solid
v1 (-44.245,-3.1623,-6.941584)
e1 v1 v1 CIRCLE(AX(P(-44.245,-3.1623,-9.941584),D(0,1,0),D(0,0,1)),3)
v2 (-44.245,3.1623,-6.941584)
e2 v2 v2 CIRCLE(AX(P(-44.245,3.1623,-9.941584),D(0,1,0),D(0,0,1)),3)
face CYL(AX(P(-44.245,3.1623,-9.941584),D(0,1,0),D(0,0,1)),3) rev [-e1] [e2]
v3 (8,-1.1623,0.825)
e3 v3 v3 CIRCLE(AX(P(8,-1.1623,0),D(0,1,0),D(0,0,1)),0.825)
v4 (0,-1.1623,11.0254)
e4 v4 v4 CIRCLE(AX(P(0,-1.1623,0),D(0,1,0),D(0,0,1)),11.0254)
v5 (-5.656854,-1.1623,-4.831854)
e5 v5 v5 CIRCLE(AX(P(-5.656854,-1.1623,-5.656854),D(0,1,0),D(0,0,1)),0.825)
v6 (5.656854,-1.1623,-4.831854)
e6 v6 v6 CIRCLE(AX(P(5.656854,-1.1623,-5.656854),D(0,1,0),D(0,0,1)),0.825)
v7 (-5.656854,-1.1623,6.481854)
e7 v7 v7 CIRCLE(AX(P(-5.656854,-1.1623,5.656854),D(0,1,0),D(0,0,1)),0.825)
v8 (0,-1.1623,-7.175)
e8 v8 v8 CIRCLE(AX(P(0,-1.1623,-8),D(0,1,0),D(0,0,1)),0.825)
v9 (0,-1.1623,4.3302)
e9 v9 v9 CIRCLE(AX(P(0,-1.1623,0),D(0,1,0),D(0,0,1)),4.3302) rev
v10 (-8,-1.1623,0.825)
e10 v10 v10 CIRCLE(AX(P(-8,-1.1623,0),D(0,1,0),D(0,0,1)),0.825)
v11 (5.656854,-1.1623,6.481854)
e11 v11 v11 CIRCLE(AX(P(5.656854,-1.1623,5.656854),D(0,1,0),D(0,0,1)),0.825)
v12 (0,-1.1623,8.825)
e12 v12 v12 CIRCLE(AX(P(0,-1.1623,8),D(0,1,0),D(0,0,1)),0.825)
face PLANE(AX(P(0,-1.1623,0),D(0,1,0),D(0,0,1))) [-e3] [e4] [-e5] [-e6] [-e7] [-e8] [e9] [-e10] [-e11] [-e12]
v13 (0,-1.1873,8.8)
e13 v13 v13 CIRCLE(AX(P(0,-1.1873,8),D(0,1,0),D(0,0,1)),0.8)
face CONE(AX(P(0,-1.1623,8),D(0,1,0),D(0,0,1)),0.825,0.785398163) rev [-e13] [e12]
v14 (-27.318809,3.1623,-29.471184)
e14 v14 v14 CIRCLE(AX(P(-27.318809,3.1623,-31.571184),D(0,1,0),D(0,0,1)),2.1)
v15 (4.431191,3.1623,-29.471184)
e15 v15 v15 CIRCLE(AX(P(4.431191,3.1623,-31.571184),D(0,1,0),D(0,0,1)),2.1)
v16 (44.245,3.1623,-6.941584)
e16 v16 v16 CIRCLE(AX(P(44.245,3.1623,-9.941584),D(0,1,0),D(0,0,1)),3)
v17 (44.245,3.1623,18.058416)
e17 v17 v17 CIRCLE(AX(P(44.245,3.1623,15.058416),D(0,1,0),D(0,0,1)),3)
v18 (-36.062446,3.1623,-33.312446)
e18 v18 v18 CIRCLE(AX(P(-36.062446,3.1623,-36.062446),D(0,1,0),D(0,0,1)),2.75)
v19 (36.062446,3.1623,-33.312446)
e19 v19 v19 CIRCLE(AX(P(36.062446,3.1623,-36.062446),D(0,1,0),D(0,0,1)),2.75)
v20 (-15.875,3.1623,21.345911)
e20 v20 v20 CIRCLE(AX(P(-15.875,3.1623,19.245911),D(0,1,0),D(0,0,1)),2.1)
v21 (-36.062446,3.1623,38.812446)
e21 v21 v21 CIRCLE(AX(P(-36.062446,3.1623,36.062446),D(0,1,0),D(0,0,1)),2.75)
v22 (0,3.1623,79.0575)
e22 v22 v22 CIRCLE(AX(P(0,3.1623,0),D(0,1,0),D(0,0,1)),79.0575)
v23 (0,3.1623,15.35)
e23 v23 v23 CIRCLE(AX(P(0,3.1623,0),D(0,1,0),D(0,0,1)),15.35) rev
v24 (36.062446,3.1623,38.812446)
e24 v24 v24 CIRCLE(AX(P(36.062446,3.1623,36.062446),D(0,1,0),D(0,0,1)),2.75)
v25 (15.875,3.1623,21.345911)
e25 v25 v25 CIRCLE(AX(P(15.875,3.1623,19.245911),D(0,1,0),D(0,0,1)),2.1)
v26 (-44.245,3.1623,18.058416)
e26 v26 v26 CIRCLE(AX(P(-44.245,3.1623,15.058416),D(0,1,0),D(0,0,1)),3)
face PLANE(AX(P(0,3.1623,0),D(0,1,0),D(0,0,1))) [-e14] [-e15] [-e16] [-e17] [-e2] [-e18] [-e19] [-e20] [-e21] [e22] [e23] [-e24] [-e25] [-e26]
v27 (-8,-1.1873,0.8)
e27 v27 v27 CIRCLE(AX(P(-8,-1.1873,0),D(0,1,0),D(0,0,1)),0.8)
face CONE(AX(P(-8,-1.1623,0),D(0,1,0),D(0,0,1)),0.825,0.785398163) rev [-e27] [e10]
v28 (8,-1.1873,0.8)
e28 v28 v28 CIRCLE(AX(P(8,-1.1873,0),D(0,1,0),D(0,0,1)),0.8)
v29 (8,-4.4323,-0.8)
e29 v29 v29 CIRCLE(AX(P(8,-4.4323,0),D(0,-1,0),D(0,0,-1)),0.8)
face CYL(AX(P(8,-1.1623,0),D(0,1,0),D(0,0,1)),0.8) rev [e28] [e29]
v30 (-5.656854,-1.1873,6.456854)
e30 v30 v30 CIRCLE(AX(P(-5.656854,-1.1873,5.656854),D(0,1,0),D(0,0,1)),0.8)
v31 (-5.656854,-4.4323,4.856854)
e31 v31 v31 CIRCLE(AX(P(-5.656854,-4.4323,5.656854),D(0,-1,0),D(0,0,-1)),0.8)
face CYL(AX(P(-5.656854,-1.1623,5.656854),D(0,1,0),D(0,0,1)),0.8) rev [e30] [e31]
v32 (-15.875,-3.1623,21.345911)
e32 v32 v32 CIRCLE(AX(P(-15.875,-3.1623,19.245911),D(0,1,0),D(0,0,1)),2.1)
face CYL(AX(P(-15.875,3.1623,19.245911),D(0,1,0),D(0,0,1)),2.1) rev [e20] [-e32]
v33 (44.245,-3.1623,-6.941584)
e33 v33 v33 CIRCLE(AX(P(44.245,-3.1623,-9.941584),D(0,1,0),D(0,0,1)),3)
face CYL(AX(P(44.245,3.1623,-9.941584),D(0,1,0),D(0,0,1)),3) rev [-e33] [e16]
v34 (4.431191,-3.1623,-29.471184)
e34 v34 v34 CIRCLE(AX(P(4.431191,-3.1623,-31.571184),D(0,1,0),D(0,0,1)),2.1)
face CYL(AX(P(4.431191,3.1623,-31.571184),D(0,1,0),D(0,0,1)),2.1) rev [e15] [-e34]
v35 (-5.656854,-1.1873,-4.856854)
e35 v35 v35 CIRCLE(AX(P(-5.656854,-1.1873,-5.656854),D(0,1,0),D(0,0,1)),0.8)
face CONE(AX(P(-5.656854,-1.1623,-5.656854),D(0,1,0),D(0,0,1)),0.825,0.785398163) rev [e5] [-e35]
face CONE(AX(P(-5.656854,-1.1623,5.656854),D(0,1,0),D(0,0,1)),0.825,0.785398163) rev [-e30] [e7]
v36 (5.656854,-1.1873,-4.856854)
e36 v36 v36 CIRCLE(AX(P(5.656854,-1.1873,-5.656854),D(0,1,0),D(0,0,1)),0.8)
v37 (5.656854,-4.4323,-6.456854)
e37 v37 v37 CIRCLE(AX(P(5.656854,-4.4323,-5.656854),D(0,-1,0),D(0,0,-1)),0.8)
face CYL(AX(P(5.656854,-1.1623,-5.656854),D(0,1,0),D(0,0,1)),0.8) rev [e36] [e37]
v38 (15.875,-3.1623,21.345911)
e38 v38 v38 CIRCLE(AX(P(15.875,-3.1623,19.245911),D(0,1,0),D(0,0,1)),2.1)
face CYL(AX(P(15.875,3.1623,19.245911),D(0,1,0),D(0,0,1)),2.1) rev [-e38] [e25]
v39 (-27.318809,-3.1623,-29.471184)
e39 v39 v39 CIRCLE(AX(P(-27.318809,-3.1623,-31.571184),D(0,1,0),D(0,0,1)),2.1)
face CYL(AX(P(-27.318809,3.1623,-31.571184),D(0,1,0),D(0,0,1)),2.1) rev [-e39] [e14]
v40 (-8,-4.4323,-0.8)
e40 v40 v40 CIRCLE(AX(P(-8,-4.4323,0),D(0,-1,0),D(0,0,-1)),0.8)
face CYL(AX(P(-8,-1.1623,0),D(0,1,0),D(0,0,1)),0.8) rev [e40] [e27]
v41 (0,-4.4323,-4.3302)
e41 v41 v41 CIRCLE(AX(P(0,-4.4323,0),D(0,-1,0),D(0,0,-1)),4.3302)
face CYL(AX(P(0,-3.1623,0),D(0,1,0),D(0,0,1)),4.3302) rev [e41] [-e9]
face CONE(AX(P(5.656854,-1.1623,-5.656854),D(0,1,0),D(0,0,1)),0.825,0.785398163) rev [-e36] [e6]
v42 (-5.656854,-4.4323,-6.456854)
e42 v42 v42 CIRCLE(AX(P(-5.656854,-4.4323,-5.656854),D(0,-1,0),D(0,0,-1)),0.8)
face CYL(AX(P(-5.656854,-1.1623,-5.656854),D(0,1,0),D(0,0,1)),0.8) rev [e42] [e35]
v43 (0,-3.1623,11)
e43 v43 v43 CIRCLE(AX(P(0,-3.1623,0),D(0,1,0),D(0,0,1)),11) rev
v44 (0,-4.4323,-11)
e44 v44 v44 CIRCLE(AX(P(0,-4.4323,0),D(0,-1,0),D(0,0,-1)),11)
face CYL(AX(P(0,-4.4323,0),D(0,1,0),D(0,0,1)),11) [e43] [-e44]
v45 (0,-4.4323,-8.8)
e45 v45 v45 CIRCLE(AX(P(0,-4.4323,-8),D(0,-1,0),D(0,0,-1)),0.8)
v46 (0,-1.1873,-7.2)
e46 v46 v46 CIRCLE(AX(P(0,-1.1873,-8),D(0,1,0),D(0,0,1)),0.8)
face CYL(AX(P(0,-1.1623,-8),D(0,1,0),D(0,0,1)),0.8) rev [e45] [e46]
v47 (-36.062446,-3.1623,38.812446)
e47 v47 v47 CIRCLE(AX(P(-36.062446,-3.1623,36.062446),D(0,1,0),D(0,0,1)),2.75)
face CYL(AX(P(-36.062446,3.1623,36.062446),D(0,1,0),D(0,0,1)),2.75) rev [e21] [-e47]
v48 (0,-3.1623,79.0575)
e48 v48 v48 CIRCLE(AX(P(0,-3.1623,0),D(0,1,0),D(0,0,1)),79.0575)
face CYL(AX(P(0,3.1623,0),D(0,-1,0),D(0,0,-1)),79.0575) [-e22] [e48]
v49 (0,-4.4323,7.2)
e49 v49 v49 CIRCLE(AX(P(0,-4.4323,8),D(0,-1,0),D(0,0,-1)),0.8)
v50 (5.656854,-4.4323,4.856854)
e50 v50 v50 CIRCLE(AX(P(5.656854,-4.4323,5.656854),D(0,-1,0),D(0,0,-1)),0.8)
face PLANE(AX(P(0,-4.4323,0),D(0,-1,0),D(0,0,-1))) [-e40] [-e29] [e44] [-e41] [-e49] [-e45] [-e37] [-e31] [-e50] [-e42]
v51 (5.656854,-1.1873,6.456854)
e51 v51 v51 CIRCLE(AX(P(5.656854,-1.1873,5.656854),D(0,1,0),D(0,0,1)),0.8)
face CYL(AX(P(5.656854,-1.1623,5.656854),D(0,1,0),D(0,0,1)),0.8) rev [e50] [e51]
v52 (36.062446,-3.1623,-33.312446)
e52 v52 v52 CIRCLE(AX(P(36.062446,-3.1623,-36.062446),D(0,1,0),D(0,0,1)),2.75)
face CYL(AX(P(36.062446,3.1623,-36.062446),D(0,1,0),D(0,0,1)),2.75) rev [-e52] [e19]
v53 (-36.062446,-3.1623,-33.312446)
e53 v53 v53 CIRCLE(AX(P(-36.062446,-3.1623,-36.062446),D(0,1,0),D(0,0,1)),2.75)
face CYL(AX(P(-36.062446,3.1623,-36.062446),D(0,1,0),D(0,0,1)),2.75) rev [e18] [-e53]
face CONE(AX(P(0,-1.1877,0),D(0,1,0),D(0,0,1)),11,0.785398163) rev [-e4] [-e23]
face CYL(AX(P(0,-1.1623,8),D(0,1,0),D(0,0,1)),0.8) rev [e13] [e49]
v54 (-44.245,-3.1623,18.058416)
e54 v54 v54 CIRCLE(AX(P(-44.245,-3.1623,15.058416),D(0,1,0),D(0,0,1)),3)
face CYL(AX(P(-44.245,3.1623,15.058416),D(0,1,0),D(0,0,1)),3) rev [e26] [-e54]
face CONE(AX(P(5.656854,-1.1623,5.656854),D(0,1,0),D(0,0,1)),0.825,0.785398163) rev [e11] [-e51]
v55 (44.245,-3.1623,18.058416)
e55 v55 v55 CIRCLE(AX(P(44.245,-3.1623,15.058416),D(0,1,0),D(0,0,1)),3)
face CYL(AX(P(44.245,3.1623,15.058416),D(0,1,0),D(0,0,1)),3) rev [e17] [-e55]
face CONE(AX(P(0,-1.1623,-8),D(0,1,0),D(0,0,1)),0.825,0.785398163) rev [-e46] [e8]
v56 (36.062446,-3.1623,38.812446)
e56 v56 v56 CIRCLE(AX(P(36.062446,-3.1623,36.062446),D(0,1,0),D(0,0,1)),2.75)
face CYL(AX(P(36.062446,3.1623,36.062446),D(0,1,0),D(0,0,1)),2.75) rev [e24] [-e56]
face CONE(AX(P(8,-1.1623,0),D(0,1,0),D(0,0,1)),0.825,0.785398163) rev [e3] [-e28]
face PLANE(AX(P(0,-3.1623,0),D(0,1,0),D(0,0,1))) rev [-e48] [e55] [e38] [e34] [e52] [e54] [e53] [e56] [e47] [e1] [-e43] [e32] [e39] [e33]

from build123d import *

# Parameters (mm, degrees)
SKETCH1_R                             = 79.0575
BOSS_EXTRUDE1_DEPTH                   = 3.1623
TAP_DRILL_FOR_M5X0_8_TAP1_D           = 4.2
TAP_DRILL_FOR_M7X1_0_TAP1_D           = 6
M5_CLEARANCE_HOLE1_D                  = 5.5
SKETCH32_R                            = 4.330200001
CUT_EXTRUDE1_DEPTH                    = 112.982932528
SKETCH32_4_R                          = 11
SKETCH32_4_R_2                        = 4.330200001
CUT_EXTRUDE2_DEPTH                    = 4.3246
CHAMFER1_SIZE                         = 4.35
TAP_DRILL_FOR_M2X0_4_TAP1_D           = 1.6
TAP_DRILL_FOR_M2X0_4_TAP1_CSINK_D     = 1.65
TAP_DRILL_FOR_M2X0_4_TAP1_CSINK_ANGLE = 90
BOSS_EXTRUDE3_START                   = 1.27
SKETCH35_R                            = 11
SKETCH35_R_2                          = 0.8
SKETCH35_R_3                          = 4.330200001
BOSS_EXTRUDE3_DEPTH                   = 1.27


with BuildPart() as part:
    # Sketch1 → Boss-Extrude1 (new, symmetric)
    with BuildSketch(Plane(origin=(0, 0, 0), x_dir=(1, 0, 0), z_dir=(0, 1, 0))):
        with Locations(Location((0, 0, 0), (0, 0, 270))):
            Circle(SKETCH1_R)
    extrude(amount=BOSS_EXTRUDE1_DEPTH, both=True)

    # Tap Drill for M5x0.8 Tap1 (through all)
    with Locations(Plane(origin=(0, 3.1623, 0), x_dir=(1, 0, 0), z_dir=(0, 1, 0))):
        with Locations((-27.3188086, 31.571183672), (4.4311914, 31.571183672), (-15.875, -19.245910728), (15.875, -19.245910728)):
            Hole(TAP_DRILL_FOR_M5X0_8_TAP1_D / 2)

    # Tap Drill for M7x1.0 Tap1 (through all)
    with Locations(Plane(origin=(0, 3.1623, 0), x_dir=(1, 0, 0), z_dir=(0, 1, 0))):
        with Locations((-44.245, 9.941583672), (-44.245, -15.058416328), (44.245, 9.941583672), (44.245, -15.058416328)):
            Hole(TAP_DRILL_FOR_M7X1_0_TAP1_D / 2)

    # M5 Clearance Hole1 (through all)
    with Locations(Plane(origin=(0, 3.1623, 0), x_dir=(1, 0, 0), z_dir=(0, 1, 0))):
        with Locations((-36.062445841, 36.062445841), (-36.062445841, -36.062445841), (36.062445841, -36.062445841), (36.062445841, 36.062445841)):
            Hole(M5_CLEARANCE_HOLE1_D / 2)

    # Sketch32 → Cut-Extrude1 (cut, through all)
    with BuildSketch(Plane(origin=(0, 3.1623, 0), x_dir=(1, 0, 0), z_dir=(0, 1, 0))):
        with Locations(Location((0, 0, 0), (0, 0, 270))):
            Circle(SKETCH32_R)
    extrude(amount=-CUT_EXTRUDE1_DEPTH, mode=Mode.SUBTRACT)

    # Sketch32<4> → Cut-Extrude2 (cut)
    with BuildSketch(Plane(origin=(0, 3.1623, 0), x_dir=(1, 0, 0), z_dir=(0, 1, 0))):
        with Locations(Location((0, 0, 0), (0, 0, 270))):
            Circle(SKETCH32_4_R)
        with Locations(Location((0, 0, 0), (0, 0, 270))):
            Circle(SKETCH32_4_R_2, mode=Mode.SUBTRACT)
    extrude(amount=-CUT_EXTRUDE2_DEPTH, mode=Mode.SUBTRACT)

    # Chamfer1
    # the kernel refuses this chamfer: 4.35 mm, written as the material it takes off along each edge
    with BuildSketch(Plane(origin=(0, 3.1623, 0), x_dir=(0, 0, 1), z_dir=(-1, 0, 0))) as chamfer1_piece_1_section:
        Polygon((11 + CHAMFER1_SIZE, 0), (11, -CHAMFER1_SIZE), (11, 0), align=None)
    chamfer1_piece_1 = revolve(axis=Axis((0, 3.1623, 0), (0, 1, 0)), mode=Mode.PRIVATE)
    chamfer1_piece_1 = split(chamfer1_piece_1, bisect_by=Plane(origin=(0, -1.1623, -13.183253191), z_dir=(0, 1, 0)), keep=Keep.TOP, mode=Mode.PRIVATE)
    add(chamfer1_piece_1, mode=Mode.SUBTRACT)

    # Tap Drill for M2x0.4 Tap1 (through all)
    with Locations(Plane(origin=(0, -1.1623, 0), x_dir=(1, 0, 0), z_dir=(0, 1, 0))):
        with Locations((-8, 0), (-5.656854249, 5.656854249), (0, 8), (5.656854249, 5.656854249), (8, 0), (5.656854249, -5.656854249), (0, -8), (-5.656854249, -5.656854249)):
            CounterSinkHole(TAP_DRILL_FOR_M2X0_4_TAP1_D / 2, TAP_DRILL_FOR_M2X0_4_TAP1_CSINK_D / 2, counter_sink_angle=TAP_DRILL_FOR_M2X0_4_TAP1_CSINK_ANGLE)

    # Sketch35 → Boss-Extrude3 (add)
    with BuildSketch(Plane.XZ.offset(3.1623).offset(BOSS_EXTRUDE3_START)):
        with Locations(Location((0, 0, 0), (0, 0, 90))):
            Circle(SKETCH35_R)
        with Locations(Location((-5.656854249, 5.656854249, 0), (0, 0, 90))):
            Circle(SKETCH35_R_2, mode=Mode.SUBTRACT)
        with Locations(Location((-8, 0, 0), (0, 0, 90))):
            Circle(SKETCH35_R_2, mode=Mode.SUBTRACT)
        with Locations(Location((-5.656854249, -5.656854249, 0), (0, 0, 90))):
            Circle(SKETCH35_R_2, mode=Mode.SUBTRACT)
        with Locations(Location((0, -8, 0), (0, 0, 90))):
            Circle(SKETCH35_R_2, mode=Mode.SUBTRACT)
        with Locations(Location((5.656854249, -5.656854249, 0), (0, 0, 90))):
            Circle(SKETCH35_R_2, mode=Mode.SUBTRACT)
        with Locations(Location((8, 0, 0), (0, 0, 90))):
            Circle(SKETCH35_R_2, mode=Mode.SUBTRACT)
        with Locations(Location((5.656854249, 5.656854249, 0), (0, 0, 90))):
            Circle(SKETCH35_R_2, mode=Mode.SUBTRACT)
        with Locations(Location((0, 8, 0), (0, 0, 90))):
            Circle(SKETCH35_R_2, mode=Mode.SUBTRACT)
        with Locations(Location((0, 0, 0), (0, 0, 90))):
            Circle(SKETCH35_R_3, mode=Mode.SUBTRACT)
    extrude(amount=-BOSS_EXTRUDE3_DEPTH)


solid = part.part
